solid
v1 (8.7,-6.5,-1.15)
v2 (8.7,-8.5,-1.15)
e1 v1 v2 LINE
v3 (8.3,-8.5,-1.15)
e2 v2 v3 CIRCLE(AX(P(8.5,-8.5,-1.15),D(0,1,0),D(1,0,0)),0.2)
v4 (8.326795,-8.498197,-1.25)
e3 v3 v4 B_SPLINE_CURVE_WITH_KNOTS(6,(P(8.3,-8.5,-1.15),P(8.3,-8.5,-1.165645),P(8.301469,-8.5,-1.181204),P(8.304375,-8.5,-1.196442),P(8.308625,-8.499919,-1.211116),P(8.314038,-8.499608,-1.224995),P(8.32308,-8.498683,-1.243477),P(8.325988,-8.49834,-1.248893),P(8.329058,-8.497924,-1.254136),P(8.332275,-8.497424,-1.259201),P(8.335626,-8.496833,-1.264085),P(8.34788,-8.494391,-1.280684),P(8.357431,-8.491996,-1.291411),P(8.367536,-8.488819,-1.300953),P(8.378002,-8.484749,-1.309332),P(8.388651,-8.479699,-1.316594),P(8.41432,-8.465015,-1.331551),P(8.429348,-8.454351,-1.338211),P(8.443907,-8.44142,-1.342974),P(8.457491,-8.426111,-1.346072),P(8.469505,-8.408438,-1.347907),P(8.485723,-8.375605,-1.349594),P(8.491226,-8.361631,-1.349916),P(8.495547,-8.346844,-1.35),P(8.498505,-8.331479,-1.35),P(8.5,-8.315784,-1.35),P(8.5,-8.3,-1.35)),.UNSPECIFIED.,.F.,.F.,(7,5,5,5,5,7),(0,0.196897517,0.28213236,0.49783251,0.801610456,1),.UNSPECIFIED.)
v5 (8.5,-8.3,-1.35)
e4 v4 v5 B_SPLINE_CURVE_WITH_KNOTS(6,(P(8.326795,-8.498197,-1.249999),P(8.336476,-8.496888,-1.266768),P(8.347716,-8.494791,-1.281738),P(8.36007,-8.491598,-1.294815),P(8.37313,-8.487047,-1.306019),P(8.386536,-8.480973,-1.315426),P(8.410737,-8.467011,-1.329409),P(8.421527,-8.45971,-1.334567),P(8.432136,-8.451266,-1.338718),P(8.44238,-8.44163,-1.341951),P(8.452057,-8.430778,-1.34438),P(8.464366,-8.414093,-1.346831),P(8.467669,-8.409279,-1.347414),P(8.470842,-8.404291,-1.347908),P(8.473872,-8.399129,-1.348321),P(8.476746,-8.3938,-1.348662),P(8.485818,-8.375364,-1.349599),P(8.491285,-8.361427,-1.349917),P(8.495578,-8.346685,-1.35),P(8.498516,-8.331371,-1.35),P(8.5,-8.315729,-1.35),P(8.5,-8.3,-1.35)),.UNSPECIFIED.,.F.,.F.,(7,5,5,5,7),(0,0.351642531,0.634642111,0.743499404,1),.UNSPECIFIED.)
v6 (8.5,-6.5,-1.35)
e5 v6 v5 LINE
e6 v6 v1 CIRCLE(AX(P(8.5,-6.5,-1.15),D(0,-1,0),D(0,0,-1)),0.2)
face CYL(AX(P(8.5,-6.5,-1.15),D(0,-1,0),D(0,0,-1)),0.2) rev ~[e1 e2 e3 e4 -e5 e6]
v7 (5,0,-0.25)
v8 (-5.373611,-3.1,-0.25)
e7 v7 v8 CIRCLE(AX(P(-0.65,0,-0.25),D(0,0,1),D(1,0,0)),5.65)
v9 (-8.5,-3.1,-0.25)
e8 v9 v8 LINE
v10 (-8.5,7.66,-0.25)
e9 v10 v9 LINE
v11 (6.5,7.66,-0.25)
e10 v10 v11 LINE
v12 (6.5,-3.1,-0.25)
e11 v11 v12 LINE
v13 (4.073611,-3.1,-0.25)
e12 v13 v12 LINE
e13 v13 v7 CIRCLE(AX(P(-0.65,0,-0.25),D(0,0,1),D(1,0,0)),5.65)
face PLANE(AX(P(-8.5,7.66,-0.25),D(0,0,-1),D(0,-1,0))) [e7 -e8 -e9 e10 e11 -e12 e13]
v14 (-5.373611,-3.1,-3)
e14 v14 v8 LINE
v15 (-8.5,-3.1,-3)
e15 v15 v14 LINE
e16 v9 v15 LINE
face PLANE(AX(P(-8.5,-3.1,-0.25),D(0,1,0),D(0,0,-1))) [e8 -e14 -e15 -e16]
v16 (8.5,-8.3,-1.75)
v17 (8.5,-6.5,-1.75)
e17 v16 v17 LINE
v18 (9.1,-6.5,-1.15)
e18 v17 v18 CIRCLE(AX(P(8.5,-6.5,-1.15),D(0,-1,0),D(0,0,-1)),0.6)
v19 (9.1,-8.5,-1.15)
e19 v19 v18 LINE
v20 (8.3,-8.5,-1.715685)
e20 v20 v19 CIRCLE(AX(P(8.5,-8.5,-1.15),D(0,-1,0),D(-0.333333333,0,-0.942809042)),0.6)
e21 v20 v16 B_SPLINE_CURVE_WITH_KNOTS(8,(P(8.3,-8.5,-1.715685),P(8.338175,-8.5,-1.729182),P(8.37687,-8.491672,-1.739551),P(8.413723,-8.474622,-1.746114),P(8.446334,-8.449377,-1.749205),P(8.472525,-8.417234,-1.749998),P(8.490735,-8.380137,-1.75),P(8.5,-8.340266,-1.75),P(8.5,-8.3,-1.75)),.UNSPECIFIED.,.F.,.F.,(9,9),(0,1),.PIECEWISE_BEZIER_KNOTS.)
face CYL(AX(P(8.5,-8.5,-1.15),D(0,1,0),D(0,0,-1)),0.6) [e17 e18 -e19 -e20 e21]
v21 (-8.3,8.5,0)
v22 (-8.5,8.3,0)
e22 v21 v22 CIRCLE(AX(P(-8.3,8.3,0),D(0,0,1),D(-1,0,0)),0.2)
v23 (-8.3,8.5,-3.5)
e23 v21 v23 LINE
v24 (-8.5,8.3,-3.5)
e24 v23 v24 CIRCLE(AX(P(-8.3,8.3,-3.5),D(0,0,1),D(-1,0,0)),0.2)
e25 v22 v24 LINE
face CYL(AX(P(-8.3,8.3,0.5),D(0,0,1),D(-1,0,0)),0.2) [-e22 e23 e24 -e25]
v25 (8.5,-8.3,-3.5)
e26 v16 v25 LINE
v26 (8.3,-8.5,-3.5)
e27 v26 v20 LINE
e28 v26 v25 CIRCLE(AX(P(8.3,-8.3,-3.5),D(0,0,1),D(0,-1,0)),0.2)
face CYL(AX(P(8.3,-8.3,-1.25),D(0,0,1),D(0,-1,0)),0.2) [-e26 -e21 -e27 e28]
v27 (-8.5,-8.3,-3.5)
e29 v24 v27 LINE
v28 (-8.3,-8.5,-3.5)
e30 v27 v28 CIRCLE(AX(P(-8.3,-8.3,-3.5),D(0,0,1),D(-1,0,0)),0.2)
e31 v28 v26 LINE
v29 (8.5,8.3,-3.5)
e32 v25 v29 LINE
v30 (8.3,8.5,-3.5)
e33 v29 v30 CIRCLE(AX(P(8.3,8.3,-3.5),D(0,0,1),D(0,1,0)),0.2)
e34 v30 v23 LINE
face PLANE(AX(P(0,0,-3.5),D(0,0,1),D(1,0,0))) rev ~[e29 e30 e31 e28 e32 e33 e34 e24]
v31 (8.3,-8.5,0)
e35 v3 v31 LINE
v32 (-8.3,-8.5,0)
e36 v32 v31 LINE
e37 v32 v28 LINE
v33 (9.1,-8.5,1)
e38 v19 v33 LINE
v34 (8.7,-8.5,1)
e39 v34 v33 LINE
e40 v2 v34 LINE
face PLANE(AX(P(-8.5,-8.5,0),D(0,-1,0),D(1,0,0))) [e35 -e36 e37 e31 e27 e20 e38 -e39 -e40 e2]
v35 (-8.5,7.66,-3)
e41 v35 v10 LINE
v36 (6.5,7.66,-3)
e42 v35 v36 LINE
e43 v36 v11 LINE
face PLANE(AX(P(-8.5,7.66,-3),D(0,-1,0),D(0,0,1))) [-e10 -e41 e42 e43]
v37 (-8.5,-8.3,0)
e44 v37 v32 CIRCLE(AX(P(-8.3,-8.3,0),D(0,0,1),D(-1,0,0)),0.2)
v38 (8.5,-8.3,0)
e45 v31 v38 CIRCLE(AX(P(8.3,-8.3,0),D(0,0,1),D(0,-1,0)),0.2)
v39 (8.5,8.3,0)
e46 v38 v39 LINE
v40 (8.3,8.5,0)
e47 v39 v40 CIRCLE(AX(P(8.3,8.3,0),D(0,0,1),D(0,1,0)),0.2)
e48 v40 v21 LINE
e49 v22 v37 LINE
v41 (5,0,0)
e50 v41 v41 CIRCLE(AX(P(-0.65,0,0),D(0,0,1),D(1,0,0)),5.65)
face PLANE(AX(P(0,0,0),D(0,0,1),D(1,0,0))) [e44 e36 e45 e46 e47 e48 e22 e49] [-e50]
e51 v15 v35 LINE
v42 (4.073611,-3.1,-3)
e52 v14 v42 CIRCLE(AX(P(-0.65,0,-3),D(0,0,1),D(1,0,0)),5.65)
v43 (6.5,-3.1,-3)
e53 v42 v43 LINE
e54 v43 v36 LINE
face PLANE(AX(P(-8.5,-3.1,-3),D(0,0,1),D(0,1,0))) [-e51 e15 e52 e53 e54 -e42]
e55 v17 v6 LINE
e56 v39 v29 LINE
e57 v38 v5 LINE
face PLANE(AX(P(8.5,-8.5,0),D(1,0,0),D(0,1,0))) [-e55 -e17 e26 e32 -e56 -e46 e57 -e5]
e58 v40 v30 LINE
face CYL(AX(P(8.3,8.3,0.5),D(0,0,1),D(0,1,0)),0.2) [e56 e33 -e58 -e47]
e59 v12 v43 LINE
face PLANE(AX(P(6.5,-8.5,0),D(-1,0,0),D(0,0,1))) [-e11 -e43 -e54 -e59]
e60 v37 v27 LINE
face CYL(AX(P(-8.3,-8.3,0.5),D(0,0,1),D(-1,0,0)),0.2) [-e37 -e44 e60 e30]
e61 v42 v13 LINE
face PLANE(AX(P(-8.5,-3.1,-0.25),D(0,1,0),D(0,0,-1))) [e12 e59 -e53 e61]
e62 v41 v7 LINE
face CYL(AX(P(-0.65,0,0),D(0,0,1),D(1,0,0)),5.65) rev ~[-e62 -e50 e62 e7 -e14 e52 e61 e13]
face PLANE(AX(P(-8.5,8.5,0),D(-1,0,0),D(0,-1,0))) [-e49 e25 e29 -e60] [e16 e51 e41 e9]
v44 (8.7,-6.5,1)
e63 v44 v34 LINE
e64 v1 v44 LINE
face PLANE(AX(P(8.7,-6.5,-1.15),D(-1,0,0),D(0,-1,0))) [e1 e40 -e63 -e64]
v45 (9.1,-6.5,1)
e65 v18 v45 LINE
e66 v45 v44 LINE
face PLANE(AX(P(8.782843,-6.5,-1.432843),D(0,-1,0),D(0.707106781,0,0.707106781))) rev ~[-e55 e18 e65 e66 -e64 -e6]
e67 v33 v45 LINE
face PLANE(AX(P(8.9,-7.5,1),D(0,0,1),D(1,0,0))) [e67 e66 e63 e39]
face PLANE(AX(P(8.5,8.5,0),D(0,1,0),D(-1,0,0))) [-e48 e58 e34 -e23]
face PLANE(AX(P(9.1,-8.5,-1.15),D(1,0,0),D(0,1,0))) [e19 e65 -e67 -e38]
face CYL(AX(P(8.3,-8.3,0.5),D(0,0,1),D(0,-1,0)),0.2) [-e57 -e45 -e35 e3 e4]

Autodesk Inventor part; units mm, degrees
ref_plane "YZ Plane" through (0, 0, 0) normal (1, 0, 0) x (0, 1, 0)
ref_plane "XZ Plane" through (0, 0, 0) normal (0, 1, 0) x (-1, 0, 0)
ref_plane "XY Plane" through (0, 0, 0) normal (0, 0, 1) x (1, 0, 0)
sketch "master" plane through (0, 0, 0) normal (0, 0, 1) x (1, 0, 0)
  line L0 (-8.5, -8.5) -> (8.5, -8.5)
  line L1 (8.5, -8.5) -> (8.5, 8.5)
  line L2 (8.5, 8.5) -> (-8.5, 8.5)
  line L3 (-8.5, 8.5) -> (-8.5, -8.5)
  line L4 (-8.5, -8.5) -> (8.5, 8.5) construction
  line L5 (8.5, -8.5) -> (-8.5, 8.5) construction
  circle A0 centre (-0.65, 0) radius 5.65
  line L6 (5, 0) -> (8.5, 0) construction
  point P0 (0, 0)
  point P1 (0, 0)
  dimension "d1" = 11.3
  dimension "d0" = 17
  dimension "d12" = 3.5
  dimension "d14" = 9.15
  dimension "d22" = 0.65
extrude "body" add sketch "master" against normal blind 3.5 contours L3 L2 L1 L0 | A0
sketch "Sketch2" plane through (-8.5, -8.5, 0) normal (-1, 0, 0) x (0, 0, 1)
  line L0 (0, 17) -> (0, 0) projected
  line L1 (0, 17) -> (-3.5, 17) projected
  line L2 (-3.5, 0) -> (-3.5, 17) projected
  line L3 (0, 0) -> (-3.5, 0) projected
  line L4 (0, 17) -> (0, 0) projected
  line L5 (-3, 16.16) -> (-0.25, 16.16)
  line L6 (-0.25, 16.16) -> (-0.25, 5.4)
  line L7 (-0.25, 5.4) -> (-3, 5.4)
  line L8 (-3, 5.4) -> (-3, 16.16)
  point P0 (0, 8.5)
  dimension "d4" = 5.4
  dimension "d5" = 0.84
  dimension "d6" = 0.25
  dimension "d7" = 0.5
extrude "outlet" cut sketch "Sketch2" against normal blind 15 contours L5 L6 L7 L8
extrude "Extrusion3" cut sketch "master" against normal up to surface (3 mm away) contours A0
sketch "Sketch3" plane through (-8.5, -8.5, 0) normal (0, -1, 0) x (1, 0, 0)
  line L0 (17, 0) -> (17, -3.5) projected
  arc A0 (17, -1.75) -> (17.6, -1.15) centre (17, -1.15) ccw
  line L1 (17.6, -1.15) -> (17.6, 1)
  point P0 (8.5, 0)
  dimension "d15" = 1
  dimension "d16" = 0.6
sketch "Sketch4" plane through (8.5, -8.5, 0) normal (1, 0, 0) x (0, 0, -1)
  line L0 (1.35, 2) -> (1.35, 0)
  line L1 (1.35, 0) -> (1.75, 0)
  line L2 (1.75, 0) -> (1.75, 2)
  line L3 (1.75, 2) -> (1.35, 2)
  line L4 (1.35, 2) -> (1.75, 0) construction
  line L5 (1.35, 0) -> (1.75, 2) construction
  line L6 (0, 0) -> (3.5, 0) projected
  point P0 (0, 8.5)
  point P1 (1.55, 1)
  dimension "d17" = 2
  dimension "d18" = 0.4
sweep "Sweep1" add profiles "Sketch4" path "Sketch3" path curves A0 L1
fillet "Fillet1" radius 0.2 5 edges at (8.5, -8.5, -2.625) (8.5, 8.5, -1.75) (-8.5, -8.5, -1.75) (-8.5, 8.5, -1.75) (8.5, -8.5, -0.675)
properties part number "fan_sunon_ub3h3_500" material "PC/ABS Plastic"
